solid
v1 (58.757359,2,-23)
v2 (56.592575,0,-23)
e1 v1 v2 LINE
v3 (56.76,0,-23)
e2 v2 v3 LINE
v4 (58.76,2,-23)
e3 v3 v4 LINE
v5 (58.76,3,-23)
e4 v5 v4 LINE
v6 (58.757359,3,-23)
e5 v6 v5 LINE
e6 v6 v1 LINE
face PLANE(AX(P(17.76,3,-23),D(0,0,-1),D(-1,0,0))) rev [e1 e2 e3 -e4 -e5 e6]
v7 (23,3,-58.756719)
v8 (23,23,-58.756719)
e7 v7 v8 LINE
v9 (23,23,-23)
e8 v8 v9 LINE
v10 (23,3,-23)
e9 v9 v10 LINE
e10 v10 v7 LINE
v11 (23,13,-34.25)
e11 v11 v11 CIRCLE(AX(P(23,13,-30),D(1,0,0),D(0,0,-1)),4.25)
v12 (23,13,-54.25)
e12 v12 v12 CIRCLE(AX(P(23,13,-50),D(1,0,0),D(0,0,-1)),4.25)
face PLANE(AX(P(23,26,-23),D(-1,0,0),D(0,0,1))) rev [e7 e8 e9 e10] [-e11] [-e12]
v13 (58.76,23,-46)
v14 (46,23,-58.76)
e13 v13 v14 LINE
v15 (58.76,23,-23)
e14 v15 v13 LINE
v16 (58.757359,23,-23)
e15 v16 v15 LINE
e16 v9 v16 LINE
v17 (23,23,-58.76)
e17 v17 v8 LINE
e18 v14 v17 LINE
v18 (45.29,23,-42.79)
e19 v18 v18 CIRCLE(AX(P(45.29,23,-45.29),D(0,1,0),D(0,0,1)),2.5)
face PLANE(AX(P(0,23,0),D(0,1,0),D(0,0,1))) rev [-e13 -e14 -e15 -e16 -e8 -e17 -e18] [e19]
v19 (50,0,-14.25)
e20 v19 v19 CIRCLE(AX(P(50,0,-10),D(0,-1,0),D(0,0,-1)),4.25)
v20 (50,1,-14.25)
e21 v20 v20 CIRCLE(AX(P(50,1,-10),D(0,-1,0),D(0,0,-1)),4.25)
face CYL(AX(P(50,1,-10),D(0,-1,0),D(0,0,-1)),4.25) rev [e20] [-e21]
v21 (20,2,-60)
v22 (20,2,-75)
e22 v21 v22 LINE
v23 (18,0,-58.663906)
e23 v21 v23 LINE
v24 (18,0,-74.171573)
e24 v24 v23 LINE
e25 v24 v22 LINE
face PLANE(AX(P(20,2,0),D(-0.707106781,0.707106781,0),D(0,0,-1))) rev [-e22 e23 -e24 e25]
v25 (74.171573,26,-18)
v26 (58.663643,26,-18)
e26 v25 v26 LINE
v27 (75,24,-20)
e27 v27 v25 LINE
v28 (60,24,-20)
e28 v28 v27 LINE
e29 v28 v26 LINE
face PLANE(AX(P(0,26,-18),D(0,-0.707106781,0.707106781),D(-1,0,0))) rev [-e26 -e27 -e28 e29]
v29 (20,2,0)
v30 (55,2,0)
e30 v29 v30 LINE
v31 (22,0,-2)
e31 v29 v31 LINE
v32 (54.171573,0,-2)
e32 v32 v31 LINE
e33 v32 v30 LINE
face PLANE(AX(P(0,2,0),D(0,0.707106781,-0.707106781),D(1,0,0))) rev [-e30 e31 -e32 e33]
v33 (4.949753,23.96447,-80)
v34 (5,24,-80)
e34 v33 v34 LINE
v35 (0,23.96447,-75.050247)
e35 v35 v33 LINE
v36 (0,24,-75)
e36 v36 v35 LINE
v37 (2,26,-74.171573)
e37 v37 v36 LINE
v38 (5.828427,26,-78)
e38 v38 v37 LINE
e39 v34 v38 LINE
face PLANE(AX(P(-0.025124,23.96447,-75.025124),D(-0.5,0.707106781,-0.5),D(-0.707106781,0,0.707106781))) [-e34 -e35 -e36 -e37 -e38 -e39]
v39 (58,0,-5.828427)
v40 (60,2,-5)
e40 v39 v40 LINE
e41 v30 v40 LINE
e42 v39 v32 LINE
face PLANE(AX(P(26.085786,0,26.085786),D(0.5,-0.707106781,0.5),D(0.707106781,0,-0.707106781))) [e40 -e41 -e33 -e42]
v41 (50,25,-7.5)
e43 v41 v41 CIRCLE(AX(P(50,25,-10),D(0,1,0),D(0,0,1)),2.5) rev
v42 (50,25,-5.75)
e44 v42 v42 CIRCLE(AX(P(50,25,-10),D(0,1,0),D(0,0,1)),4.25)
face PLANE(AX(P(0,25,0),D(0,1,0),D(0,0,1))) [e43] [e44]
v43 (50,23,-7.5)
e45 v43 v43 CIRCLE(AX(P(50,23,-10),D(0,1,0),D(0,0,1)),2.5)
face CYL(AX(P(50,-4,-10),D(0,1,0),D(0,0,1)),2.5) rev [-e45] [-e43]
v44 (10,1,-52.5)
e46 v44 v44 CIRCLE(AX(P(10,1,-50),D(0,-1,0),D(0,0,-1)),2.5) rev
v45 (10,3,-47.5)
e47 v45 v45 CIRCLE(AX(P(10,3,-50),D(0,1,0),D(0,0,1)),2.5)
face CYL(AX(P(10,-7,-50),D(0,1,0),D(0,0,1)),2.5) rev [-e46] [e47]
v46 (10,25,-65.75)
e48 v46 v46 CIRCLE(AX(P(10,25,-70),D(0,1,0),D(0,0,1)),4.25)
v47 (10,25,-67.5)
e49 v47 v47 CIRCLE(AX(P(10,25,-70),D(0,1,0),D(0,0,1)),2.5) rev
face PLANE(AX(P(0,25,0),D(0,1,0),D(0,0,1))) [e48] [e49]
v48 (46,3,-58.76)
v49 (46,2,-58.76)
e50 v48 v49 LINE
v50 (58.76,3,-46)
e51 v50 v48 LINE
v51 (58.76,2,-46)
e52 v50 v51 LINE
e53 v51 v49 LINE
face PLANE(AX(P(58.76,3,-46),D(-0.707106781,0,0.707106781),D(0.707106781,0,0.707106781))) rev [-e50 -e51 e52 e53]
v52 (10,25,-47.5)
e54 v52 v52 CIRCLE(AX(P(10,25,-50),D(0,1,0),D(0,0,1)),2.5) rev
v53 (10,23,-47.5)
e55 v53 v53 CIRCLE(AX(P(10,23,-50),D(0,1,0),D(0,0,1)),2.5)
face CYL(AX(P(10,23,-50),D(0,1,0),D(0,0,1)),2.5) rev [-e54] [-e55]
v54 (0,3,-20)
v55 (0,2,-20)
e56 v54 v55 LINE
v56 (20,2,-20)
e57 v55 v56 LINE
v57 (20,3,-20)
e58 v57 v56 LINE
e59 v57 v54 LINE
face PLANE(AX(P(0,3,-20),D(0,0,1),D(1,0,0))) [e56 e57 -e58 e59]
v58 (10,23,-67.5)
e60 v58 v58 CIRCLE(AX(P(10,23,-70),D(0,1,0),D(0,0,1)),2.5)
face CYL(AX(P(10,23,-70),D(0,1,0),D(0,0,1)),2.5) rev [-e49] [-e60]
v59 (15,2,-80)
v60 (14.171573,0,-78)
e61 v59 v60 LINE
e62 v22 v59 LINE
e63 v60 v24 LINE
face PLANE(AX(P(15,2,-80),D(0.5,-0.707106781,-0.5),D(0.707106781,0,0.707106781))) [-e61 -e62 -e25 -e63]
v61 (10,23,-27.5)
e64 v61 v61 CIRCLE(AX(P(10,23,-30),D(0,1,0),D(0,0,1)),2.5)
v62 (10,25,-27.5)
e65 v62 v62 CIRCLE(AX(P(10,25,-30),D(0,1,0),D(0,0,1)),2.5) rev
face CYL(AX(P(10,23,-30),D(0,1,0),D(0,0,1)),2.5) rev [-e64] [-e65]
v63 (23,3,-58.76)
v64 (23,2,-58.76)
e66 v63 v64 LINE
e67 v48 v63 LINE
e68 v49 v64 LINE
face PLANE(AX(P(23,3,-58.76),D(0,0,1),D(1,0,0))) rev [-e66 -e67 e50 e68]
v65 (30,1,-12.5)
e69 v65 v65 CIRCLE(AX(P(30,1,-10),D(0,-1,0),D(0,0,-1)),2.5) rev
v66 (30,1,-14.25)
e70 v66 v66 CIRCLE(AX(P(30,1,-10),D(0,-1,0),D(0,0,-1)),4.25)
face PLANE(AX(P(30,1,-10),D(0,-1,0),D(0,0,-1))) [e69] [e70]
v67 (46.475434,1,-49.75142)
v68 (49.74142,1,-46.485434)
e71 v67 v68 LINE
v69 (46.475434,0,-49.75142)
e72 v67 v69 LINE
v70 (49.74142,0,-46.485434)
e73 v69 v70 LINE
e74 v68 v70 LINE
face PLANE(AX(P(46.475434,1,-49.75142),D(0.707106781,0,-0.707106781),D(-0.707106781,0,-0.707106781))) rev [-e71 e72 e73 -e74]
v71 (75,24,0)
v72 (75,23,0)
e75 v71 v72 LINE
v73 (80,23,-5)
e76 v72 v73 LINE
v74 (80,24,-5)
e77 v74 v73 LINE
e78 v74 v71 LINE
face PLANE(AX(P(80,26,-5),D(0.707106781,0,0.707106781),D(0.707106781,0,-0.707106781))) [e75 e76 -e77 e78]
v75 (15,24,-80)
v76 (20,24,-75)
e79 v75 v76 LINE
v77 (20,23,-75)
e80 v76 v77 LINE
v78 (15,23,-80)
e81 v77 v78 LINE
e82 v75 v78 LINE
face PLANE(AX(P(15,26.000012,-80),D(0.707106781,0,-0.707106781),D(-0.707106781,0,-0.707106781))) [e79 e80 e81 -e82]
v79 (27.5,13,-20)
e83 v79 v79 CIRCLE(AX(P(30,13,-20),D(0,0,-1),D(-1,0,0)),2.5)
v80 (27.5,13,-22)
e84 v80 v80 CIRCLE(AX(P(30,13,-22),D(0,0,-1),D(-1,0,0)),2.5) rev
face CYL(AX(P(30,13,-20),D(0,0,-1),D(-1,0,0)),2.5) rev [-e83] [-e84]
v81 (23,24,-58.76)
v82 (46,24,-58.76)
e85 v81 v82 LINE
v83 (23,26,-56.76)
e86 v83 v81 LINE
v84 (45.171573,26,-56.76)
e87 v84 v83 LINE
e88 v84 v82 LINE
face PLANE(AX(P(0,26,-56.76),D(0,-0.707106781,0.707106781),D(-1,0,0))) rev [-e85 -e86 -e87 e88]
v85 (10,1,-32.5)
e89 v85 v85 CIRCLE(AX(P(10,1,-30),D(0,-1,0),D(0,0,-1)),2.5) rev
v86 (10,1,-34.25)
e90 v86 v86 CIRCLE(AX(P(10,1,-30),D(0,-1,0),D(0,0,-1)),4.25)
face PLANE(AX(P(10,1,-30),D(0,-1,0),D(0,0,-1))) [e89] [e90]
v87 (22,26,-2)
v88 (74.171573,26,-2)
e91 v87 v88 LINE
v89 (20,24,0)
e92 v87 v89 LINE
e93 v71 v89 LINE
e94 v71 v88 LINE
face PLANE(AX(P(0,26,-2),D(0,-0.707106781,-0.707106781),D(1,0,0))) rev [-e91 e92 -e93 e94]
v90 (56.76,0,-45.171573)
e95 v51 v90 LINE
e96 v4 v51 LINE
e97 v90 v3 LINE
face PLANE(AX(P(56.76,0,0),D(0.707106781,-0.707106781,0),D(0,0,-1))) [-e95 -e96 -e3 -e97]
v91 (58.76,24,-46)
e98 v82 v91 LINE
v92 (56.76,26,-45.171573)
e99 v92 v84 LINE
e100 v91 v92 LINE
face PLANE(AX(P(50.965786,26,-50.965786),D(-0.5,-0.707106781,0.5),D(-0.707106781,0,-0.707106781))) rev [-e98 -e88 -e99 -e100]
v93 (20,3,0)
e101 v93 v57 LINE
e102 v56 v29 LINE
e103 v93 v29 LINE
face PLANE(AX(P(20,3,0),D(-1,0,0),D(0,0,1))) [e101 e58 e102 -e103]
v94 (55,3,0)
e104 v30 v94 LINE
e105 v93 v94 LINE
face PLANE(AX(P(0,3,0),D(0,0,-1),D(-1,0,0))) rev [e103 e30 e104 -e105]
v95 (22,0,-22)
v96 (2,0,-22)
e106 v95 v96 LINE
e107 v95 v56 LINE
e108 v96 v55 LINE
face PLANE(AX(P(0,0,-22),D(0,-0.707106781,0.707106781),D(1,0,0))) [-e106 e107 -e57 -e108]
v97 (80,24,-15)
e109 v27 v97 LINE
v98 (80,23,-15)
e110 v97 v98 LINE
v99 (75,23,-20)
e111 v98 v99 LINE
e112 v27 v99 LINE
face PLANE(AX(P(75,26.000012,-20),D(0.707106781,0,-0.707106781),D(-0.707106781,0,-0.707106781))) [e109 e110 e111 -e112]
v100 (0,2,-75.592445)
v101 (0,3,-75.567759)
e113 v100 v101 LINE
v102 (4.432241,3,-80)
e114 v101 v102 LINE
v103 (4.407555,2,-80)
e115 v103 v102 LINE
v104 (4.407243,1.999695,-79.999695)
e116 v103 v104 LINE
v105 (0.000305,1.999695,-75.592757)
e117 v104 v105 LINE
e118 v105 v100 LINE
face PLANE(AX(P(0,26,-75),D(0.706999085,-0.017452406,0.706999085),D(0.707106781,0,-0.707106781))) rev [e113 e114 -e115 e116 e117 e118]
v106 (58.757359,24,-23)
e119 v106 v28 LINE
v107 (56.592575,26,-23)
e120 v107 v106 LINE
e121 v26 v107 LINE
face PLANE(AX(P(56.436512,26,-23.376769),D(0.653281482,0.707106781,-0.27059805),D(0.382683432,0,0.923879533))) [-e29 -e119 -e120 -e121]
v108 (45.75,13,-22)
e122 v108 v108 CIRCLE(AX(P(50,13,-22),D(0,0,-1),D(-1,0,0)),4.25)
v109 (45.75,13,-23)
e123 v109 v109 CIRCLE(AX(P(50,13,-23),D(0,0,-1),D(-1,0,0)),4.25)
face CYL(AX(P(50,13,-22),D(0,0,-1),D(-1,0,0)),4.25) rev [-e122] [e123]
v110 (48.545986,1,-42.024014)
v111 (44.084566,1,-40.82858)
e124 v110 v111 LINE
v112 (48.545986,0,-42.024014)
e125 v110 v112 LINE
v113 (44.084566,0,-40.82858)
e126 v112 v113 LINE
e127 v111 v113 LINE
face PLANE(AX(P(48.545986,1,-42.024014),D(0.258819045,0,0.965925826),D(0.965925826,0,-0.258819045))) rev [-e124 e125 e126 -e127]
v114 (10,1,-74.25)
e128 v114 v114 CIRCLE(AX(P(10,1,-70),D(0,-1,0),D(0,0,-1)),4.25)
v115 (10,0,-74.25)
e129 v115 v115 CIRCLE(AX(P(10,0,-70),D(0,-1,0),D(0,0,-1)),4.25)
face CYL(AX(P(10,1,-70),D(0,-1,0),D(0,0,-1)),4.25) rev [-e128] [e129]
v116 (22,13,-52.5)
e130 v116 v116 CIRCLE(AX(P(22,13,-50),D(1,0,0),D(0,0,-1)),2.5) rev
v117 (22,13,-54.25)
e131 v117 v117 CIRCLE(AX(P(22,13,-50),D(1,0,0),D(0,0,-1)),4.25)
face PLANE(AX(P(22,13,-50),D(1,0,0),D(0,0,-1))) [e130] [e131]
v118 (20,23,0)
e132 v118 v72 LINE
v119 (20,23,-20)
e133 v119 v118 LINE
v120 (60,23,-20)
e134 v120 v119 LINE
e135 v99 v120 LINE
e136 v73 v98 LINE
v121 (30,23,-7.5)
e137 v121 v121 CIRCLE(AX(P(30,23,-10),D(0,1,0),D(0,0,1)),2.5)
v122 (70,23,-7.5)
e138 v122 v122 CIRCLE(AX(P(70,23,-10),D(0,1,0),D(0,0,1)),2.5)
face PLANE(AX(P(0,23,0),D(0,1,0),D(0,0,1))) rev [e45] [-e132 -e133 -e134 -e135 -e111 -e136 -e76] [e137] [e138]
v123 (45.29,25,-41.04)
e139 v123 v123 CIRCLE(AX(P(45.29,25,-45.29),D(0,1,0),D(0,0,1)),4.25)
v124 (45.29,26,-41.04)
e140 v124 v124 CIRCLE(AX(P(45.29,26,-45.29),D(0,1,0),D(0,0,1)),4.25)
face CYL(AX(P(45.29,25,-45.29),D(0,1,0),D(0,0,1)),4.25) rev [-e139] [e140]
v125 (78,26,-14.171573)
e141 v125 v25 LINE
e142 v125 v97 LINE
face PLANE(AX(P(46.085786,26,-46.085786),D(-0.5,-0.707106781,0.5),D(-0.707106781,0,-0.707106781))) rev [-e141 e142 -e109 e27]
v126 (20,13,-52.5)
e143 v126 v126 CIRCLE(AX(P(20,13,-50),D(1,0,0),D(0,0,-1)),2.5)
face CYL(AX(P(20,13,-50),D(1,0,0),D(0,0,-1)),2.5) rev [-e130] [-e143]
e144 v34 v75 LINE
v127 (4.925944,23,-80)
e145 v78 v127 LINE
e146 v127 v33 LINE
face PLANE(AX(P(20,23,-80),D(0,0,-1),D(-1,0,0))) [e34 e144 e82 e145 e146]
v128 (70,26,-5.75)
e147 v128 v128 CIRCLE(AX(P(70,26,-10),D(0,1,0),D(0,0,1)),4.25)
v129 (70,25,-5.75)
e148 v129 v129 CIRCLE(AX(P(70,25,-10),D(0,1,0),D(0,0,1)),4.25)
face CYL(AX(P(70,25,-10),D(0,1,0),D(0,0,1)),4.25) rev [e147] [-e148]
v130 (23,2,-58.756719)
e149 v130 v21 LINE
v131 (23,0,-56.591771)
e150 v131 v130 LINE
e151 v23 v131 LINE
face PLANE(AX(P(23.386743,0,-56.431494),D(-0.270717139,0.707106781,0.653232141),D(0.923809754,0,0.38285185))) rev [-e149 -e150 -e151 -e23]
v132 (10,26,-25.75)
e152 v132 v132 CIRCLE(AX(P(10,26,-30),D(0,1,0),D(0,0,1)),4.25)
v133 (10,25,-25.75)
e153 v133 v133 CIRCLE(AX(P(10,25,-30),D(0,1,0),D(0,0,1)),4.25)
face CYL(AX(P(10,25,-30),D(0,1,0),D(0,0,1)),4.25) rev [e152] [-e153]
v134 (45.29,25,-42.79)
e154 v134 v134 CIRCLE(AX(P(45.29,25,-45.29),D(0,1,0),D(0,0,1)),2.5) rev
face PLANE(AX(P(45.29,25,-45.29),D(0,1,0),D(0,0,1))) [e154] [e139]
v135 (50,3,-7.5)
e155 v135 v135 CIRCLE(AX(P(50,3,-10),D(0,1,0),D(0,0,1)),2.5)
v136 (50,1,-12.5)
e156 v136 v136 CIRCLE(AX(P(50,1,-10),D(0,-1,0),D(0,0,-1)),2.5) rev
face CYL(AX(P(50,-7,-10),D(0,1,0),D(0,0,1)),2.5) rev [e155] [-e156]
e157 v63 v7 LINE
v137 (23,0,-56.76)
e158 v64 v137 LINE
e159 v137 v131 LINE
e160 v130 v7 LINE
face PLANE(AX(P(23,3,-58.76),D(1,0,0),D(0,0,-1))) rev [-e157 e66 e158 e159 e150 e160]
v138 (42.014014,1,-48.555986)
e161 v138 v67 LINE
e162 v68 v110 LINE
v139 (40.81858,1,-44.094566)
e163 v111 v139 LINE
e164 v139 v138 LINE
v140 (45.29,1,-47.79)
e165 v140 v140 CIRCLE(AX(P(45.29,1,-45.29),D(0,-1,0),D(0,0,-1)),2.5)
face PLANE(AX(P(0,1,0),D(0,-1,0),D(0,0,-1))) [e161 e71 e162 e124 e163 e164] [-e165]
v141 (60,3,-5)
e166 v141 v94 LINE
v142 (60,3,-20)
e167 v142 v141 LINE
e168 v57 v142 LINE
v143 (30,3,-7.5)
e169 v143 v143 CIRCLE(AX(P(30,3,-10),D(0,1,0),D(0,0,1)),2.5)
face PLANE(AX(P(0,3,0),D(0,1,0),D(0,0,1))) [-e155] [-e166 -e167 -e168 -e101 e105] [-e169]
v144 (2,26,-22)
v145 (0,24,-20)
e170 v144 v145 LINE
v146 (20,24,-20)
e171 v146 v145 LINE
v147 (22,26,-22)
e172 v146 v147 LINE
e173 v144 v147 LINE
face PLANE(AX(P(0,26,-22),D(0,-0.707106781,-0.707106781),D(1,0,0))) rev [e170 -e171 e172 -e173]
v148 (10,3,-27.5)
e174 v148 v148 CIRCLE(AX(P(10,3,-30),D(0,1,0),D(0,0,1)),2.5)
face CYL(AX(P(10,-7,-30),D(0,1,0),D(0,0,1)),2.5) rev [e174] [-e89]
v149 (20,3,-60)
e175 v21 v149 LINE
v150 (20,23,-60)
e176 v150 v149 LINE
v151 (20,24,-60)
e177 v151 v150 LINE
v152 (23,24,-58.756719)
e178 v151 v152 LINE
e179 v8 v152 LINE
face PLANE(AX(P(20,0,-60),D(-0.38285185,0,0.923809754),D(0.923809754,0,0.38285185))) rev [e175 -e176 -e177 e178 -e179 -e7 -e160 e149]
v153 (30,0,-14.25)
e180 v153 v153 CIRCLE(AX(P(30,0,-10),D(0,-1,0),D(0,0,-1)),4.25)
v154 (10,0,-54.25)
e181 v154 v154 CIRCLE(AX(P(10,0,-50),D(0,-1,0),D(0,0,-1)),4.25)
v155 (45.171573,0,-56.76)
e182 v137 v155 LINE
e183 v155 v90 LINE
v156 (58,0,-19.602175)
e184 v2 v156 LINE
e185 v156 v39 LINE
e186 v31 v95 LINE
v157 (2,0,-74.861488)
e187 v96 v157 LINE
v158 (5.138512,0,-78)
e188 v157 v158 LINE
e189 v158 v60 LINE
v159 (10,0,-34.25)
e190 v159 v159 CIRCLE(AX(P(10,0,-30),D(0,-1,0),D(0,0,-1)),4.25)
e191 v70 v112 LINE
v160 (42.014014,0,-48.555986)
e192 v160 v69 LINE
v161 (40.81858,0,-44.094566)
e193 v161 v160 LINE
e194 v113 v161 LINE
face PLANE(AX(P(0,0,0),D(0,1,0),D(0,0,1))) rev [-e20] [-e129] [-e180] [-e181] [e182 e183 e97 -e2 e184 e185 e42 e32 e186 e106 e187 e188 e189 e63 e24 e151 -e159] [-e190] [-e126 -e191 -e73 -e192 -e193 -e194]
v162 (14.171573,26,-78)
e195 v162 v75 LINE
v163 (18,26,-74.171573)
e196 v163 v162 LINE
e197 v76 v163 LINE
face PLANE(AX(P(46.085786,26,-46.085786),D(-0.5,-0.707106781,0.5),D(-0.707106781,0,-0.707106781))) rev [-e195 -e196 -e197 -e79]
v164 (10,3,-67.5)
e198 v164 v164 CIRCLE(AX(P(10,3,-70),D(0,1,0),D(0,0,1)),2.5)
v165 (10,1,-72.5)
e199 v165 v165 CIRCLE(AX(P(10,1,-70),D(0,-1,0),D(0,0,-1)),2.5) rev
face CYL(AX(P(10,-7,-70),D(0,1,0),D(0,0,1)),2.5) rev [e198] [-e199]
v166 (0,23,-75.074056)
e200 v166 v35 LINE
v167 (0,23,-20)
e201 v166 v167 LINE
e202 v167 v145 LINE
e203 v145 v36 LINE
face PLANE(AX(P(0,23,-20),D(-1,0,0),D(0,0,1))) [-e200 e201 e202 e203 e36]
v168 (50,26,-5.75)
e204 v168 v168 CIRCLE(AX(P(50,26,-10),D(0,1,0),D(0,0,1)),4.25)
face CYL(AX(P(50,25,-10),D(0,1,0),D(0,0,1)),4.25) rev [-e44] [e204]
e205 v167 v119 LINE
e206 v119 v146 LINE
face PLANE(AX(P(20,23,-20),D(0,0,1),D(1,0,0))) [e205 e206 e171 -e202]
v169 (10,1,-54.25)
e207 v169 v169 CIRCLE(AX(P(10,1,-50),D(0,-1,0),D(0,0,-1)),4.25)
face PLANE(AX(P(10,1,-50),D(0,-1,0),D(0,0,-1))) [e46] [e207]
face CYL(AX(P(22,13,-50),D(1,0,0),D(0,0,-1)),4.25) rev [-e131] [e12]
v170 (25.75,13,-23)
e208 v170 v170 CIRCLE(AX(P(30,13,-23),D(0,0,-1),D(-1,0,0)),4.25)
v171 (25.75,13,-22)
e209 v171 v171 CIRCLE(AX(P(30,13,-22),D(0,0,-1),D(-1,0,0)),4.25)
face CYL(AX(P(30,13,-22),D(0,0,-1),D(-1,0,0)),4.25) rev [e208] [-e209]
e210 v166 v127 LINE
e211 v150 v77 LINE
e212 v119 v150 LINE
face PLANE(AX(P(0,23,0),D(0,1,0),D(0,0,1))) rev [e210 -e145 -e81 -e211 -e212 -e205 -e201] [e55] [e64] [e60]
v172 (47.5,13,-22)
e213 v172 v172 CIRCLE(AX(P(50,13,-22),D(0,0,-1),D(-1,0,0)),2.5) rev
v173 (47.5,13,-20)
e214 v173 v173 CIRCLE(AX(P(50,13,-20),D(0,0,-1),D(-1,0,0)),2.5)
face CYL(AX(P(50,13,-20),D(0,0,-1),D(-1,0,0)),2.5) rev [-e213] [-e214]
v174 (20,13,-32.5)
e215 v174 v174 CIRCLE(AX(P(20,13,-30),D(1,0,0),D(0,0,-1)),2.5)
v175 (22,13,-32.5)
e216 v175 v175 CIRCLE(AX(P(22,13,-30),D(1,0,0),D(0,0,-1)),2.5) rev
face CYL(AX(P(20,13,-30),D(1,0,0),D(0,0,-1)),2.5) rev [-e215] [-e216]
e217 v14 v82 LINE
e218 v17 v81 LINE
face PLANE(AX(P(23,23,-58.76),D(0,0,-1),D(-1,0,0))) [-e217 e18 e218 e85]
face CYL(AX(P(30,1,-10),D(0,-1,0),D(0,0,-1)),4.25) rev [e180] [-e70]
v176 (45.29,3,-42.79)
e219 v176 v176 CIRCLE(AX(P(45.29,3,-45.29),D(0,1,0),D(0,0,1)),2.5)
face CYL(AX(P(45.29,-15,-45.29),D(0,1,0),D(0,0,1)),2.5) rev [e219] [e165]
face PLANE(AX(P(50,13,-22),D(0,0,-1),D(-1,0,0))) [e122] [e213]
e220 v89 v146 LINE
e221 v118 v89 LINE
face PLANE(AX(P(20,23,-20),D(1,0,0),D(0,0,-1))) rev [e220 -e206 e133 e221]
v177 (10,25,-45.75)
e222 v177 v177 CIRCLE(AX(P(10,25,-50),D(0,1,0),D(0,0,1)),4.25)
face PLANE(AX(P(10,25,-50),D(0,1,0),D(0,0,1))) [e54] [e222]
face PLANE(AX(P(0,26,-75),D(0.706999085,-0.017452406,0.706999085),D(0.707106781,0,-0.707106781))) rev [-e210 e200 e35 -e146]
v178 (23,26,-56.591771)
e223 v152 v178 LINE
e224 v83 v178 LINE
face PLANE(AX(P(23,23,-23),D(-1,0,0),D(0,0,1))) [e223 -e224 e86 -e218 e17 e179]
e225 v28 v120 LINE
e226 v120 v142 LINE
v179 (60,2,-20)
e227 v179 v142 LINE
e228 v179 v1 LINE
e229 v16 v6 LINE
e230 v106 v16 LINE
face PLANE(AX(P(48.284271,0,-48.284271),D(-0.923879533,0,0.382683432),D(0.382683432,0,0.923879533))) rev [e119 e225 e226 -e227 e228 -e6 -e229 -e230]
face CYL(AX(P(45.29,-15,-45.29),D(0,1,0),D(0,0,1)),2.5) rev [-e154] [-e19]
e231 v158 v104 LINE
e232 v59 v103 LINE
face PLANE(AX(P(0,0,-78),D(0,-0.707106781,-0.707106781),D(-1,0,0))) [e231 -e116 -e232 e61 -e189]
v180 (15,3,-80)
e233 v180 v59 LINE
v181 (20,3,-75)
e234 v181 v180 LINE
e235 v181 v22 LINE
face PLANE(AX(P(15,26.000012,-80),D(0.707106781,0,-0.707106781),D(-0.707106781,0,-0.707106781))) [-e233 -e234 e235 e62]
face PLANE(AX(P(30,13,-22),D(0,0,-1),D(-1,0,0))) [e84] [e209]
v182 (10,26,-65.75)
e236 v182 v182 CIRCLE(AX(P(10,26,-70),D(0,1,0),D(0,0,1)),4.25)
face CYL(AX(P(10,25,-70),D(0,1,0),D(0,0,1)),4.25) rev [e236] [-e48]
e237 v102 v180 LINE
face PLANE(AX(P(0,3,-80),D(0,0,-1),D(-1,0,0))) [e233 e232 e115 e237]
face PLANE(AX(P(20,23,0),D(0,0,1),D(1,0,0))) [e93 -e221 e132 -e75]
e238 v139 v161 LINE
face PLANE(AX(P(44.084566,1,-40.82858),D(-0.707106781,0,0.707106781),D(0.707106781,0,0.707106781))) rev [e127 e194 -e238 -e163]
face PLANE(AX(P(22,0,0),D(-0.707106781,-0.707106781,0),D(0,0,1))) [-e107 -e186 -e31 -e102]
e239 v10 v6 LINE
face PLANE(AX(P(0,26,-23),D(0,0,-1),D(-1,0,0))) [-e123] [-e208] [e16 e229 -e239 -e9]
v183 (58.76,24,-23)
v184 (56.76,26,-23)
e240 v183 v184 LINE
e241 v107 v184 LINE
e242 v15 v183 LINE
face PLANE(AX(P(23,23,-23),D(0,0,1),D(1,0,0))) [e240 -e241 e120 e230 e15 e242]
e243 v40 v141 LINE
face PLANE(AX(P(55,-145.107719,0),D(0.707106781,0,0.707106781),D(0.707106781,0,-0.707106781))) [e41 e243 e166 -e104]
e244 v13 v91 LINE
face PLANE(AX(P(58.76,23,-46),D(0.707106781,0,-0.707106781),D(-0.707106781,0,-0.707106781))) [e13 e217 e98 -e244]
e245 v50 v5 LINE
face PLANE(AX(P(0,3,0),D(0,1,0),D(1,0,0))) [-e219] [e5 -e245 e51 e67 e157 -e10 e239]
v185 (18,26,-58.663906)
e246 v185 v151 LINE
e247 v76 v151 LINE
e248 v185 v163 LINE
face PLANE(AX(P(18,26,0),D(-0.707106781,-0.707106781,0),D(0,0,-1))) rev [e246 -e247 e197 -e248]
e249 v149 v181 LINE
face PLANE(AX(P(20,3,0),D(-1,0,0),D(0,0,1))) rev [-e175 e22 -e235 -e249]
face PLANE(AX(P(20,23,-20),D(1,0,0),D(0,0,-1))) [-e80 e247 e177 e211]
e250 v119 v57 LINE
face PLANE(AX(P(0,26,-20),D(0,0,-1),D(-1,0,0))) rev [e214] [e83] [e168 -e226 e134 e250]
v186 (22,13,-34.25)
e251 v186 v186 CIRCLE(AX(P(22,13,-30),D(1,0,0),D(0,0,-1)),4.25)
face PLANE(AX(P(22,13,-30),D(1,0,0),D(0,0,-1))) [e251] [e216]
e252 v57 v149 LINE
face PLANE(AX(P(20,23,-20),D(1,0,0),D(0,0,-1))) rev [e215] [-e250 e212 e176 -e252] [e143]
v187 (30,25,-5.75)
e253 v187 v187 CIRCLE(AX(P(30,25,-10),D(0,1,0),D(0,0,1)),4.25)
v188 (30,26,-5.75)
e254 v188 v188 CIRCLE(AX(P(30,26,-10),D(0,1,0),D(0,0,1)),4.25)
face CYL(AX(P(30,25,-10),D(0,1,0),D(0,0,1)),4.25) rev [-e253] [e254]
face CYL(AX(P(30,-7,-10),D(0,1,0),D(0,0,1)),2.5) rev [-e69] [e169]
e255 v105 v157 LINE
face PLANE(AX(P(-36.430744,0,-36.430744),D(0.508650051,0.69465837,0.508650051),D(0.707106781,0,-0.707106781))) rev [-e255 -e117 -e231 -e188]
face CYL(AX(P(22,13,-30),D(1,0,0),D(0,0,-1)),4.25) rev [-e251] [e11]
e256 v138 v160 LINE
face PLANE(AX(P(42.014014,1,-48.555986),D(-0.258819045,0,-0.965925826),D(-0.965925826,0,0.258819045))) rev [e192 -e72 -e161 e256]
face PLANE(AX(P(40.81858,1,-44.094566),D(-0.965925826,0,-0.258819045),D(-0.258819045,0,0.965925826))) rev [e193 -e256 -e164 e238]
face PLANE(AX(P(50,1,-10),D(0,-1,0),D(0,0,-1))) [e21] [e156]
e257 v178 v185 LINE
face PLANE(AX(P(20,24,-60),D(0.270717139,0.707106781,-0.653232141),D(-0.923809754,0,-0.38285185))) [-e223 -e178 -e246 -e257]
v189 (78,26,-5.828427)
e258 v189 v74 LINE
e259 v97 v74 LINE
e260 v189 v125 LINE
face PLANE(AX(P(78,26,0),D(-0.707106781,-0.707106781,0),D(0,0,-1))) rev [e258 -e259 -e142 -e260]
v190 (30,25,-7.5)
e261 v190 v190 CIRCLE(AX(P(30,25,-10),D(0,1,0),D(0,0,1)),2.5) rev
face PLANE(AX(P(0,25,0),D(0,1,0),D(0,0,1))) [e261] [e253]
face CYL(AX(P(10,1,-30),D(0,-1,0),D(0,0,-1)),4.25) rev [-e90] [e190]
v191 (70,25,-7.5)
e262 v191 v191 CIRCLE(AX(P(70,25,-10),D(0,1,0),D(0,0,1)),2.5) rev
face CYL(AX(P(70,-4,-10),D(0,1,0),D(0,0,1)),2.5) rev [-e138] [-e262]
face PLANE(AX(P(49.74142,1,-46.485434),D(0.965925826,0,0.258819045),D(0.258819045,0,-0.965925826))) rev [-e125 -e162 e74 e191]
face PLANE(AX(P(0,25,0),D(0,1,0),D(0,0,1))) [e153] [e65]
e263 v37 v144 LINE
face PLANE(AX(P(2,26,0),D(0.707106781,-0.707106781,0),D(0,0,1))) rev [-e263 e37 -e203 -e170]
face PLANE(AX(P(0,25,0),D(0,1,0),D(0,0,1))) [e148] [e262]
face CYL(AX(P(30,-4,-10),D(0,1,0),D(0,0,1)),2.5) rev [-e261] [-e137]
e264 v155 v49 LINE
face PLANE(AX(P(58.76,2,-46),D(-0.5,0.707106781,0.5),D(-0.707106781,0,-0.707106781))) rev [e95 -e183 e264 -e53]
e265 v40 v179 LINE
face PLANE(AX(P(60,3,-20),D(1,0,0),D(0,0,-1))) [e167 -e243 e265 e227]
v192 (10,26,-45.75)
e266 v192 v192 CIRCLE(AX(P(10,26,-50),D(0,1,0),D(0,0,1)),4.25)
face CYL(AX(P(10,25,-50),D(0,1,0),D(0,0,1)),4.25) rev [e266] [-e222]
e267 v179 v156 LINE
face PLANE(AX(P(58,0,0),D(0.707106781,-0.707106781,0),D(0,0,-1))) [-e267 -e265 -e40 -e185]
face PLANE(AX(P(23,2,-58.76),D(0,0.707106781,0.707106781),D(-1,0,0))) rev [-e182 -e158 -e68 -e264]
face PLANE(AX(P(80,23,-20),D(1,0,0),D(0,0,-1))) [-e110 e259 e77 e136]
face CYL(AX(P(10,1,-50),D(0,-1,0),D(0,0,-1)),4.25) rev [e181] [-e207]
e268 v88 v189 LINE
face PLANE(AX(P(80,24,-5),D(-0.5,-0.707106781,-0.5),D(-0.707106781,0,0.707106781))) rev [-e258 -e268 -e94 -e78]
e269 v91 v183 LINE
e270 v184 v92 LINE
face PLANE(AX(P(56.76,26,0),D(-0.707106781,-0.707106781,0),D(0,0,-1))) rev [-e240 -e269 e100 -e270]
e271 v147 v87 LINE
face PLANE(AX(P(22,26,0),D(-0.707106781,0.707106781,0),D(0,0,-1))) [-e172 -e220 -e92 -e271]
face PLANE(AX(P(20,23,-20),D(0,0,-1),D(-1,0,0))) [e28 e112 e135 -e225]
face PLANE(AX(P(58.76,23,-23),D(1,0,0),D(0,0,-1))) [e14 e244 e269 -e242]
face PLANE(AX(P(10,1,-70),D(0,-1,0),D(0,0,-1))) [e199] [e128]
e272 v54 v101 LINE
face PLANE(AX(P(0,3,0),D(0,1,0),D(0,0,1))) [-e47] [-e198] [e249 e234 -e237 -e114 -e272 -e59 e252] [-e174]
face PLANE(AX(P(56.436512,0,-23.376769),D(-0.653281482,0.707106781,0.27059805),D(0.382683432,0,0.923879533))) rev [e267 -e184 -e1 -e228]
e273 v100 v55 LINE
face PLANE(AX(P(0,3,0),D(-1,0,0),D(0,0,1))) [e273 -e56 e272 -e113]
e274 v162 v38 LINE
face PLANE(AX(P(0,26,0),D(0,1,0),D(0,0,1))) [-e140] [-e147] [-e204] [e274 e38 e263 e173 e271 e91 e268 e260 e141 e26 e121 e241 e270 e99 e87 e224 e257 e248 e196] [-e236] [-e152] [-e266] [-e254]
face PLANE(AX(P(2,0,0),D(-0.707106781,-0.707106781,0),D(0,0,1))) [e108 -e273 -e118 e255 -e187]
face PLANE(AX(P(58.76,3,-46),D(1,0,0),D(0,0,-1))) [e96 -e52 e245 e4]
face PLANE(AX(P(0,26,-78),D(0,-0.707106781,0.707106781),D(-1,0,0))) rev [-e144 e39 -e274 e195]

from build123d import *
from OCP.BRepFilletAPI import BRepFilletAPI_MakeChamfer

# Parameters (mm, degrees)
SKETCH1_W                    = 20
SKETCH1_H                    = 80
SKETCH1_W_2                  = 60
SKETCH1_H_2                  = 20
BOSS_EXTRUDE1_DEPTH          = 3
EXTRUDE_THIN10_DEPTH         = 3
SKETCH5_W                    = 20
SKETCH5_H                    = 20
CUT_EXTRUDE2_DEPTH           = 3
SKETCH6_R                    = 2.5
CUT_EXTRUDE3_DEPTH           = 10
BOSS_EXTRUDE7_DEPTH          = 23
SKETCH8_W                    = 0.297396294
SKETCH8_H                    = 3
BOSS_EXTRUDE8_DEPTH          = 23
SKETCH13_W                   = 3
SKETCH13_H                   = 35.56274761
BOSS_EXTRUDE9_DEPTH          = 26
SKETCH14_W                   = 3
SKETCH14_H                   = 1.444164959
BOSS_EXTRUDE10_DEPTH         = 23
CUT_EXTRUDE_THIN2_DEPTH      = 116.451288429
CUT_EXTRUDE_THIN2_DEPTH_BACK = 31
SKETCH16_W                   = 60
SKETCH16_H                   = 20
BOSS_EXTRUDE11_DEPTH         = 3
SKETCH18_W                   = 1.4
SKETCH18_H                   = 3
BOSS_EXTRUDE12_DEPTH         = 23
SKETCH19_R                   = 2.5
CUT_EXTRUDE10_DEPTH          = 30
SKETCH20_W                   = 20
SKETCH20_H                   = 60
BOSS_EXTRUDE13_DEPTH         = 3
SKETCH21_R                   = 2.5
CUT_EXTRUDE12_DEPTH          = 3
SKETCH22_R                   = 2.5
CUT_EXTRUDE13_DEPTH          = 3
SKETCH23_R                   = 2.5
CUT_EXTRUDE14_DEPTH          = 3
CUT_EXTRUDE_THIN3_DEPTH      = 117.086174887
CUT_EXTRUDE_THIN3_DEPTH_BACK = 3
CUT_EXTRUDE_THIN4_DEPTH      = 117.086174887
CUT_EXTRUDE_THIN4_DEPTH_BACK = 30
CUT_EXTRUDE_THIN5_START      = -58
CUT_EXTRUDE_THIN5_OUTLINE_W  = 10
CUT_EXTRUDE_THIN5_OUTLINE_H  = 29
CUT_EXTRUDE_THIN5_DEPTH      = 4.521306028
CUT_EXTRUDE_THIN6_DEPTH      = 117.086174887
CUT_EXTRUDE_THIN6_DEPTH_BACK = 30
SKETCH31_W                   = 21
SKETCH31_H                   = 20
CUT_EXTRUDE_THIN7_DEPTH      = 3
CUT_EXTRUDE15_DEPTH          = 117.086174887
CUT_EXTRUDE15_DEPTH_BACK     = 3
CHAMFER12_SIZE               = 2
CHAMFER13_SIZE               = 2
CHAMFER14_SIZE               = 2
CHAMFER17_SIZE               = 2
CHAMFER19_SIZE               = 2
SKETCH34_R                   = 4.25
SKETCH34_R_2                 = 2.5
CUT_EXTRUDE16_DEPTH          = 1
CUT_EXTRUDE17_START          = -1
SKETCH35_R                   = 4.25
CUT_EXTRUDE17_DEPTH          = 1
SKETCH37_R                   = 4.25
CUT_EXTRUDE18_DEPTH          = 1
SKETCH38_R                   = 4.25
CUT_EXTRUDE19_DEPTH          = 1
BOSS_EXTRUDE16_DEPTH         = 3
SKETCH41_W                   = 37.632579405
SKETCH41_H                   = 10.938249111
CUT_EXTRUDE20_DEPTH          = 40
SKETCH44_W                   = 41
SKETCH44_H                   = 23
EXTRUDE_THIN11_DEPTH         = 3
EXTRUDE_THIN12_DEPTH         = 3
CHAMFER20_SIZE               = 2
CHAMFER21_SIZE               = 2
CHAMFER21_SIZE2              = 1.965988204
CHAMFER21_SIZE2_2            = 2.035840382
CHAMFER22_SIZE               = 2
CHAMFER23_SIZE               = 2
CUT_EXTRUDE28_DEPTH          = 1
SKETCH45_R                   = 2.5
CUT_EXTRUDE29_DEPTH          = 41
SKETCH47_R                   = 4.25
CUT_EXTRUDE30_DEPTH          = 1


with BuildPart() as part:
    # Sketch1 → Boss-Extrude1 (new body)
    with BuildSketch(Plane(origin=(0, 0, 0), x_dir=(1, 0, 0), z_dir=(0, 1, 0))):
        with Locations((10, 40)):
            Rectangle(SKETCH1_W, SKETCH1_H)
        with Locations((50, 10)):
            Rectangle(SKETCH1_W_2, SKETCH1_H_2)
    extrude(amount=BOSS_EXTRUDE1_DEPTH)

    # Sketch3 → Extrude-Thin10 (add)
    with BuildSketch(Plane(origin=(0, 3, 0), x_dir=(1, 0, 0), z_dir=(0, 1, 0))):
        Polygon((20, 60.000000002), (48.284271248, 48.28427125), (60, 20), (23.044818699, 4.692662707), (17.669596658, 17.669596661), (4.692662706, 23.044818701), align=None)
    extrude(amount=-EXTRUDE_THIN10_DEPTH)

    # Sketch5 → Cut-Extrude2 (cut)
    with BuildSketch(Plane(origin=(0, 0, 0), x_dir=(1, 0, 0), z_dir=(0, 1, 0))):
        with Locations((10, 10)):
            Rectangle(SKETCH5_W, SKETCH5_H)
    extrude(amount=CUT_EXTRUDE2_DEPTH, mode=Mode.SUBTRACT)

    # Sketch6 → Cut-Extrude3 (cut)
    with BuildSketch(Plane(origin=(0, 3, 0), x_dir=(1, 0, 0), z_dir=(0, 1, 0))):
        with Locations(Location((30, 10, 0), (0, 0, 270))):
            Circle(SKETCH6_R)
        with Locations(Location((50, 10, 0), (0, 0, 270))):
            Circle(SKETCH6_R)
        with Locations(Location((70, 10, 0), (0, 0, 270))):
            Circle(SKETCH6_R)
        with Locations(Location((10, 30, 0), (0, 0, 270))):
            Circle(SKETCH6_R)
        with Locations(Location((10, 50, 0), (0, 0, 270))):
            Circle(SKETCH6_R)
        with Locations(Location((10, 70, 0), (0, 0, 270))):
            Circle(SKETCH6_R)
    extrude(amount=-CUT_EXTRUDE3_DEPTH, mode=Mode.SUBTRACT)

    # Sketch7 → Boss-Extrude7 (add)
    with BuildSketch(Plane(origin=(0, 3, 0), x_dir=(1, 0, 0), z_dir=(0, 1, 0))):
        Polygon((21.395504865, 23), (21.395504865, 20), (60, 20), (58.757359313, 23), align=None)
    extrude(amount=BOSS_EXTRUDE7_DEPTH)

    # Sketch8 → Boss-Extrude8 (add)
    with BuildSketch(Plane(origin=(0, 0, 0), x_dir=(1, 0, 0), z_dir=(0, 1, 0))):
        with Locations((20.148698147, 21.5)):
            Rectangle(SKETCH8_W, SKETCH8_H)
    extrude(amount=BOSS_EXTRUDE8_DEPTH)

    # Sketch13 → Boss-Extrude9 (add)
    with BuildSketch(Plane(origin=(0, 0, 0), x_dir=(1, 0, 0), z_dir=(0, 1, 0))):
        with Locations((21.5, 40.781373805)):
            Rectangle(SKETCH13_W, SKETCH13_H)
    extrude(amount=BOSS_EXTRUDE9_DEPTH)

    # Sketch14 → Boss-Extrude10 (add)
    with BuildSketch(Plane(origin=(0, 3, 0), x_dir=(1, 0, 0), z_dir=(0, 1, 0))):
        with Locations((21.5, 59.277917521)):
            Rectangle(SKETCH14_W, SKETCH14_H)
    extrude(amount=BOSS_EXTRUDE10_DEPTH)

    # Sketch15 → Cut-Extrude-Thin2 (cut, two sides: drawn at the far end of the back side and taken through both)
    with BuildSketch(Plane(origin=(0, 3, 0), x_dir=(-1, 0, 0), z_dir=(0, -1, 0)).offset(-CUT_EXTRUDE_THIN2_DEPTH_BACK)):
        Polygon((-20, 60), (-48.28, 48.28), (-49.42855555, 51.051429261), (-21.14855555, 62.771429261), align=None)
    extrude(amount=CUT_EXTRUDE_THIN2_DEPTH + CUT_EXTRUDE_THIN2_DEPTH_BACK, mode=Mode.SUBTRACT)



with BuildPart() as body_2:
    # Sketch16 → Boss-Extrude11 (new body)
    with BuildSketch(Plane(origin=(0, 26, 0), x_dir=(1, 0, 0), z_dir=(0, 1, 0))):
        with Locations((50, 10)):
            Rectangle(SKETCH16_W, SKETCH16_H)
    extrude(amount=-BOSS_EXTRUDE11_DEPTH)


with BuildPart() as part_1:
    add(part.part)

    add(body_2.part)  # Boss-Extrude12 merges body 2
    # Sketch18 → Boss-Extrude12 (add)
    with BuildSketch(Plane(origin=(0, 3, 0), x_dir=(1, 0, 0), z_dir=(0, 1, 0))):
        with Locations((20.7, 21.5)):
            Rectangle(SKETCH18_W, SKETCH18_H)
    extrude(amount=BOSS_EXTRUDE12_DEPTH)

    # Sketch19 → Cut-Extrude10 (cut)
    with BuildSketch(Plane(origin=(0, 26, 0), x_dir=(1, 0, 0), z_dir=(0, 1, 0))):
        with Locations(Location((50, 10, 0), (0, 0, 270))):
            Circle(SKETCH19_R)
        with Locations(Location((30, 10, 0), (0, 0, 270))):
            Circle(SKETCH19_R)
        with Locations(Location((70, 10, 0), (0, 0, 270))):
            Circle(SKETCH19_R)
    extrude(amount=-CUT_EXTRUDE10_DEPTH, mode=Mode.SUBTRACT)

    # Sketch20 → Boss-Extrude13 (add)
    with BuildSketch(Plane(origin=(0, 26, 0), x_dir=(1, 0, 0), z_dir=(0, 1, 0))):
        with Locations((10, 50)):
            Rectangle(SKETCH20_W, SKETCH20_H)
    extrude(amount=-BOSS_EXTRUDE13_DEPTH)

    # Sketch21 → Cut-Extrude12 (cut)
    with BuildSketch(Plane(origin=(0, 0, -23), x_dir=(-1, 0, 0), z_dir=(0, 0, -1))):
        with Locations((-50, 13)):
            Circle(SKETCH21_R)
        with Locations((-30, 13)):
            Circle(SKETCH21_R)
    extrude(amount=-CUT_EXTRUDE12_DEPTH, mode=Mode.SUBTRACT)

    # Sketch22 → Cut-Extrude13 (cut)
    with BuildSketch(Plane(origin=(23, 0, 0), x_dir=(0, 0, -1), z_dir=(1, 0, 0))):
        with Locations((30, 13)):
            Circle(SKETCH22_R)
        with Locations((50, 13)):
            Circle(SKETCH22_R)
    extrude(amount=-CUT_EXTRUDE13_DEPTH, mode=Mode.SUBTRACT)

    # Sketch23 → Cut-Extrude14 (cut)
    with BuildSketch(Plane(origin=(0, 26, 0), x_dir=(1, 0, 0), z_dir=(0, 1, 0))):
        with Locations(Location((10, 30, 0), (0, 0, 270))):
            Circle(SKETCH23_R)
        with Locations(Location((10, 50, 0), (0, 0, 270))):
            Circle(SKETCH23_R)
        with Locations(Location((10, 70, 0), (0, 0, 270))):
            Circle(SKETCH23_R)
    extrude(amount=-CUT_EXTRUDE14_DEPTH, mode=Mode.SUBTRACT)

    # Sketch24 → Cut-Extrude-Thin3 (cut, two sides: drawn at the far end of the back side and taken through both)
    with BuildSketch(Plane(origin=(0, 0, 0), x_dir=(1, 0, 0), z_dir=(0, 1, 0)).offset(-CUT_EXTRUDE_THIN3_DEPTH_BACK)):
        Polygon((80, 5), (75, 0), (78.535533906, -3.535533906), (83.535533906, 1.464466094), align=None)
    extrude(amount=CUT_EXTRUDE_THIN3_DEPTH + CUT_EXTRUDE_THIN3_DEPTH_BACK, mode=Mode.SUBTRACT)

    # Sketch27 → Cut-Extrude-Thin4 (cut, two sides: drawn at the far end of the back side and taken through both)
    with BuildSketch(Plane(origin=(0, 26, 0), x_dir=(1, 0, 0), z_dir=(0, 1, 0)).offset(-CUT_EXTRUDE_THIN4_DEPTH_BACK)):
        Polygon((75, 20), (80, 15), (83.535533906, 18.535533906), (78.535533906, 23.535533906), align=None)
    extrude(amount=CUT_EXTRUDE_THIN4_DEPTH + CUT_EXTRUDE_THIN4_DEPTH_BACK, mode=Mode.SUBTRACT)

    # Cut-Extrude-Thin5: read off the stored shape, not the designer's step
    # Cut-Extrude-Thin5 outline → Cut-Extrude-Thin5 (cut)
    with BuildSketch(Plane(origin=(0, 0, 0), x_dir=(0.7072144605741779, 0.017447091479365764, -0.706783775813852), z_dir=(0.7069990853988247, -0.017452406437283494, 0.7069990853988237)).offset(CUT_EXTRUDE_THIN5_START)):
        with Locations((57, 11.5)):
            Rectangle(CUT_EXTRUDE_THIN5_OUTLINE_W, CUT_EXTRUDE_THIN5_OUTLINE_H)
    extrude(amount=CUT_EXTRUDE_THIN5_DEPTH, mode=Mode.SUBTRACT)

    # Sketch29 → Cut-Extrude-Thin6 (cut, two sides: drawn at the far end of the back side and taken through both)
    with BuildSketch(Plane(origin=(0, 26, 0), x_dir=(1, 0, 0), z_dir=(0, 1, 0)).offset(-CUT_EXTRUDE_THIN6_DEPTH_BACK)):
        Polygon((15, 80), (20, 75), (23.535533906, 78.535533906), (18.535533906, 83.535533906), align=None)
    extrude(amount=CUT_EXTRUDE_THIN6_DEPTH + CUT_EXTRUDE_THIN6_DEPTH_BACK, mode=Mode.SUBTRACT)

    # Sketch31 → Cut-Extrude-Thin7 (cut)
    with BuildSketch(Plane.XZ):
        with Locations((70.5, -10)):
            Rectangle(SKETCH31_W, SKETCH31_H)
    extrude(amount=-CUT_EXTRUDE_THIN7_DEPTH, mode=Mode.SUBTRACT)

    # Sketch32 → Cut-Extrude15 (cut, two sides: drawn at the far end of the back side and taken through both)
    with BuildSketch(Plane.XZ.offset(-CUT_EXTRUDE15_DEPTH_BACK)):
        Polygon((-89.366369989, 144.366369989), (55, 0), (60, -5), (204.366369989, -149.366369989), (493.099109968, 139.366369989), (199.366369989, 433.099109968), align=None)
    extrude(amount=CUT_EXTRUDE15_DEPTH + CUT_EXTRUDE15_DEPTH_BACK, mode=Mode.SUBTRACT)

    # Chamfer12
    chamfer12_edges = [part_1.edges().sort_by_distance(p)[0] for p in [
        (20, 26, -67.5),
    ]]
    chamfer(chamfer12_edges, length=CHAMFER12_SIZE)

    # Chamfer13
    chamfer13_edges = [part_1.edges().sort_by_distance(p)[0] for p in [
        (47.5, 26, 0),
        (10, 26, -20),
        (77.5, 26, -17.5),
    ]]
    chamfer(chamfer13_edges, length=CHAMFER13_SIZE)

    # Chamfer14
    chamfer14_edges = [part_1.edges().sort_by_distance(p)[0] for p in [
        (20, 0, -67.500000001),
        (0, 0, -47.820907464),
        (9.679092536, 0, -80),
        (10, 26, -80),
        (0, 26, -48.5),
        (20, 26, -12),
        (80, 26, -8.585786438),
    ]]
    chamfer(chamfer14_edges, length=CHAMFER14_SIZE)

    # Chamfer17
    chamfer17_edges = [part_1.edges().sort_by_distance(p)[0] for p in [
        (66.085786438, 26, -20),
    ]]
    chamfer(chamfer17_edges, length=CHAMFER17_SIZE)

    # Chamfer19
    chamfer19_edges = [part_1.edges().sort_by_distance(p)[0] for p in [
        (37.5, 0, 0),
    ]]
    chamfer(chamfer19_edges, length=CHAMFER19_SIZE)

    # Sketch34 → Cut-Extrude16 (cut)
    # profile 1 of 6: a face of its own
    with BuildSketch(Plane(origin=(0, 26, 0), x_dir=(1, 0, 0), z_dir=(0, 1, 0))):
        with Locations(Location((10, 30, 0), (0, 0, 270))):
            Circle(SKETCH34_R)
        with Locations(Location((10, 30, 0), (0, 0, 270))):
            Circle(SKETCH34_R_2, mode=Mode.SUBTRACT)
    # profile 2 of 6: a face of its own
    with BuildSketch(Plane(origin=(0, 26, 0), x_dir=(1, 0, 0), z_dir=(0, 1, 0))):
        with Locations(Location((10, 70, 0), (0, 0, 270))):
            Circle(SKETCH34_R)
        with Locations(Location((10, 70, 0), (0, 0, 270))):
            Circle(SKETCH34_R_2, mode=Mode.SUBTRACT)
    # profile 3 of 6: a face of its own
    with BuildSketch(Plane(origin=(0, 26, 0), x_dir=(1, 0, 0), z_dir=(0, 1, 0))):
        with Locations(Location((30, 10, 0), (0, 0, 270))):
            Circle(SKETCH34_R)
        with Locations(Location((30, 10, 0), (0, 0, 270))):
            Circle(SKETCH34_R_2, mode=Mode.SUBTRACT)
    # profile 4 of 6: a face of its own
    with BuildSketch(Plane(origin=(0, 26, 0), x_dir=(1, 0, 0), z_dir=(0, 1, 0))):
        with Locations(Location((50, 10, 0), (0, 0, 270))):
            Circle(SKETCH34_R)
        with Locations(Location((50, 10, 0), (0, 0, 270))):
            Circle(SKETCH34_R_2, mode=Mode.SUBTRACT)
    # profile 5 of 6: a face of its own
    with BuildSketch(Plane(origin=(0, 26, 0), x_dir=(1, 0, 0), z_dir=(0, 1, 0))):
        with Locations(Location((70, 10, 0), (0, 0, 270))):
            Circle(SKETCH34_R)
        with Locations(Location((70, 10, 0), (0, 0, 270))):
            Circle(SKETCH34_R_2, mode=Mode.SUBTRACT)
    # profile 6 of 6: a face of its own
    with BuildSketch(Plane(origin=(0, 26, 0), x_dir=(1, 0, 0), z_dir=(0, 1, 0))):
        with Locations(Location((10, 50, 0), (0, 0, 270))):
            Circle(SKETCH34_R)
    extrude(amount=-CUT_EXTRUDE16_DEPTH, mode=Mode.SUBTRACT)

    # Sketch35 → Cut-Extrude17 (cut)
    with BuildSketch(Plane.XZ.offset(CUT_EXTRUDE17_START)):
        with Locations(Location((50, -10, 0), (0, 0, 90))):
            Circle(SKETCH35_R)
        with Locations(Location((30, -10, 0), (0, 0, 90))):
            Circle(SKETCH35_R)
        with Locations(Location((10, -30, 0), (0, 0, 90))):
            Circle(SKETCH35_R)
        with Locations(Location((10, -50, 0), (0, 0, 90))):
            Circle(SKETCH35_R)
        with Locations(Location((10, -70, 0), (0, 0, 90))):
            Circle(SKETCH35_R)
    extrude(amount=CUT_EXTRUDE17_DEPTH, mode=Mode.SUBTRACT)

    # Sketch37 → Cut-Extrude18 (cut)
    with BuildSketch(Plane(origin=(0, 0, -23), x_dir=(-1, 0, 0), z_dir=(0, 0, -1))):
        with Locations((-50, 13)):
            Circle(SKETCH37_R)
        with Locations((-30, 13)):
            Circle(SKETCH37_R)
    extrude(amount=-CUT_EXTRUDE18_DEPTH, mode=Mode.SUBTRACT)

    # Sketch38 → Cut-Extrude19 (cut)
    with BuildSketch(Plane(origin=(23, 0, 0), x_dir=(0, 0, -1), z_dir=(1, 0, 0))):
        with Locations((30, 13)):
            Circle(SKETCH38_R)
        with Locations((50, 13)):
            Circle(SKETCH38_R)
    extrude(amount=-CUT_EXTRUDE19_DEPTH, mode=Mode.SUBTRACT)

    # Sketch30 → Boss-Extrude16 (add)
    with BuildSketch(Plane(origin=(0, 26, 0), x_dir=(1, 0, 0), z_dir=(0, 1, 0))):
        Polygon((58.76, 23), (58.76, 46), (46, 58.76), (23, 58.76), (23, 23), align=None)
    extrude(amount=-BOSS_EXTRUDE16_DEPTH)

    # Sketch41 → Cut-Extrude20 (cut)
    with BuildSketch(Plane(origin=(0, 0, -23), x_dir=(-1, 0, 0), z_dir=(0, 0, -1))):
        with Locations((-41.816289703, -2.469124556)):
            Rectangle(SKETCH41_W, SKETCH41_H)
    extrude(amount=CUT_EXTRUDE20_DEPTH, mode=Mode.SUBTRACT)

    # Sketch44 → Extrude-Thin11 (add)
    with BuildSketch(Plane(origin=(0, 0, 0), x_dir=(-1, 0, 0), z_dir=(0, -1, 0))):
        with Locations((-38.26, 34.5)):
            Rectangle(SKETCH44_W, SKETCH44_H)
    extrude(amount=-EXTRUDE_THIN11_DEPTH)

    # Sketch43 → Extrude-Thin12 (add)
    with BuildSketch(Plane(origin=(0, 0, 0), x_dir=(-1, 0, 0), z_dir=(0, -1, 0))):
        Polygon((-23, 58.76), (-46, 58.76), (-58.76, 46), (-29.768621971, 17.008621971), (-29.017243943, 17.76), (-23, 17.76), align=None)
    extrude(amount=-EXTRUDE_THIN12_DEPTH)

    # Chamfer20
    # the kernel refuses this chamfer: 2 mm, written as the material it takes off along each edge
    with BuildSketch(Plane(origin=(20, 0, -20), x_dir=(0, 1, 0), z_dir=(-1, 0, 0))) as chamfer20_piece_1:
        Polygon((CHAMFER20_SIZE, 0), (0, CHAMFER20_SIZE), (0, 0), align=None)
    extrude(amount=23.143365976, mode=Mode.SUBTRACT)
    with BuildSketch(Plane(origin=(27.751491656, 0, -56.787571351), x_dir=(0, 1, 0), z_dir=(-0.9238097537211767, 0, -0.38285184984484394))) as chamfer20_piece_2_section:
        Polygon((CHAMFER20_SIZE, 0), (0, -CHAMFER20_SIZE), (0, 0), align=None)
    chamfer20_piece_2 = extrude(amount=15.699101739, mode=Mode.PRIVATE)
    chamfer20_piece_2 = split(chamfer20_piece_2, bisect_by=Plane(origin=(22.875745828, 4.875745828, -56.787571351), z_dir=(0.7071067811865476, -0.7071067811865476, 0)), keep=Keep.TOP, mode=Mode.PRIVATE)
    chamfer20_piece_2 = split(chamfer20_piece_2, bisect_by=Plane(origin=(23, 0, -56.787571351), z_dir=(-1, 0, 0)), keep=Keep.TOP, mode=Mode.PRIVATE)
    add(chamfer20_piece_2, mode=Mode.SUBTRACT)
    with BuildSketch(Plane(origin=(42.36309104, 0, -62.39690896), x_dir=(0, 1, 0), z_dir=(0.7071067811865476, 0, 0.7071067811865476))) as chamfer20_piece_3:
        Polygon((CHAMFER20_SIZE, 0), (0, CHAMFER20_SIZE), (0, 0), align=None)
    extrude(amount=28.332097008, mode=Mode.SUBTRACT)
    with BuildSketch(Plane(origin=(53.36309104, 0, 1.63690896), x_dir=(0, 1, 0), z_dir=(0.7071067811865476, 0, -0.7071067811865476))) as chamfer20_piece_4:
        Polygon((CHAMFER20_SIZE, 0), (0, -CHAMFER20_SIZE), (0, 0), align=None)
    extrude(amount=14.529372639, mode=Mode.SUBTRACT)
    with BuildSketch(Plane(origin=(56.789078368, 0, -27.751850553), x_dir=(0, 1, 0), z_dir=(0.38268343233471624, 0, 0.9238795325238679))) as chamfer20_piece_5_section:
        Polygon((CHAMFER20_SIZE, 0), (0, CHAMFER20_SIZE), (0, 0), align=None)
    chamfer20_piece_5 = extrude(amount=13.533908553, mode=Mode.PRIVATE)
    chamfer20_piece_5 = split(chamfer20_piece_5, bisect_by=Plane(origin=(56.789078368, 0, -23), z_dir=(0, 0, 1)), keep=Keep.TOP, mode=Mode.PRIVATE)
    add(chamfer20_piece_5, mode=Mode.SUBTRACT)
    with BuildSketch(Plane(origin=(56.789078368, 26, -27.751850553), x_dir=(0, -1, 0), z_dir=(0.3826834323347171, 0, 0.9238795325238676))) as chamfer20_piece_6_section:
        Polygon((CHAMFER20_SIZE, 0), (0, -CHAMFER20_SIZE), (0, 0), align=None)
    chamfer20_piece_6 = extrude(amount=15.698692953, mode=Mode.PRIVATE)
    chamfer20_piece_6 = split(chamfer20_piece_6, bisect_by=Plane(origin=(56.789078368, 21.124074723, -22.875925277), z_dir=(0, 0.7071067811865476, -0.7071067811865476)), keep=Keep.TOP, mode=Mode.PRIVATE)
    chamfer20_piece_6 = split(chamfer20_piece_6, bisect_by=Plane(origin=(56.789078368, 26, -23), z_dir=(0, 0, 1)), keep=Keep.TOP, mode=Mode.PRIVATE)
    add(chamfer20_piece_6, mode=Mode.SUBTRACT)
    with BuildSketch(Plane(origin=(51.143365976, 26, -58.76), x_dir=(0, -1, 0), z_dir=(-1, 0, 0))) as chamfer20_piece_7_section:
        Polygon((CHAMFER20_SIZE, 0), (0, CHAMFER20_SIZE), (0, 0), align=None)
    chamfer20_piece_7 = extrude(amount=33.286731952, mode=Mode.PRIVATE)
    chamfer20_piece_7 = split(chamfer20_piece_7, bisect_by=Plane(origin=(47.017076343, 26, -48.803389861), z_dir=(0.38285184984484405, 0, -0.9238097537211767)), keep=Keep.TOP, mode=Mode.PRIVATE)
    add(chamfer20_piece_7, mode=Mode.SUBTRACT)

    # Chamfer21: one chamfer whose edges measure the first distance from different faces: ONE call of the kernel's chamfer builder (chamfer() names one face for all edges)
    chamfer21_edges_1 = [part_1.edges().sort_by_distance(p)[0] for p in [
        (2.179092536, 0, -77.820907464),
    ]]
    chamfer21_side_1 = [part_1.faces().sort_by_distance(p)[0] for p in [
        (2.202160005, 1.868931891, -77.797839995),
    ]]
    chamfer21_edges_2 = [part_1.edges().sort_by_distance(p)[0] for p in [
        (17.5, 0, -77.5),
        (33.085786438, 0, -58.76),
        (58.76, 0, -33.085786438),
        (77.5, 26, -2.5),
        (58.76, 26, -34.5),
        (53.38, 26, -51.38),
        (17.5, 26, -77.5),
    ]]
    chamfer21_edges_3 = [part_1.edges().sort_by_distance(p)[0] for p in [
        (2.5, 26, -77.5),
    ]]
    chamfer21_side_3 = [part_1.faces().sort_by_distance(p)[0] for p in [
        (33.801139056, 26, -33.763899978),
    ]]
    chamfer21 = BRepFilletAPI_MakeChamfer(part_1.part.solid().wrapped)
    for e in chamfer21_edges_1:
        chamfer21.Add(CHAMFER21_SIZE, CHAMFER21_SIZE2, e.wrapped, chamfer21_side_1[0].wrapped)  # the first distance lies on this face
    for e in chamfer21_edges_2:
        chamfer21.Add(CHAMFER21_SIZE, e.wrapped)
    for e in chamfer21_edges_3:
        chamfer21.Add(CHAMFER21_SIZE, CHAMFER21_SIZE2_2, e.wrapped, chamfer21_side_3[0].wrapped)  # the first distance lies on this face
    add(Compound.cast(chamfer21.Shape()), mode=Mode.REPLACE)

    # Chamfer22
    # the kernel refuses this chamfer: 2 mm, written as the material it takes off along each edge
    with BuildSketch(Plane(origin=(13.248508344, 26, -62.798001492), x_dir=(0, -1, 0), z_dir=(0.9238097537213213, 0, 0.3828518498444948))) as chamfer22_piece_1_section:
        Polygon((CHAMFER22_SIZE, 0), (0, -CHAMFER22_SIZE), (0, 0), align=None)
    chamfer22_piece_1 = extrude(amount=20.914483432, mode=Mode.PRIVATE)
    chamfer22_piece_1 = split(chamfer22_piece_1, bisect_by=Plane(origin=(13.248508344, 22.980999254, -59.779000746), z_dir=(0, 0.7071067811865476, -0.7071067811865476)), keep=Keep.TOP, mode=Mode.PRIVATE)
    chamfer22_piece_1 = split(chamfer22_piece_1, bisect_by=Plane(origin=(15.624254172, 28.375745828, -62.798001492), z_dir=(0.7071067811865476, 0.7071067811865476, 0)), keep=Keep.TOP, mode=Mode.PRIVATE)
    add(chamfer22_piece_1, mode=Mode.SUBTRACT)
    with BuildSketch(Plane(origin=(13.248508344, 26, -62.798001492), x_dir=(0, -1, 0), z_dir=(0.9238097537213213, 0, 0.3828518498444948))) as chamfer22_piece_2_section:
        Polygon((CHAMFER22_SIZE, 0), (0, -CHAMFER22_SIZE), (0, 0), align=None)
    chamfer22_piece_2 = extrude(amount=20.914483432, mode=Mode.PRIVATE)
    chamfer22_piece_2 = split(chamfer22_piece_2, bisect_by=Plane(origin=(23, 26, -62.798001492), z_dir=(-1, 0, 0)), keep=Keep.TOP, mode=Mode.PRIVATE)
    chamfer22_piece_2 = split(chamfer22_piece_2, bisect_by=Plane(origin=(20, 26, -62.798001492), z_dir=(1, 0, 0)), keep=Keep.TOP, mode=Mode.PRIVATE)
    add(chamfer22_piece_2, mode=Mode.SUBTRACT)
    with BuildSketch(Plane(origin=(60, 0, -23.517470299), x_dir=(-1, 0, 0), z_dir=(0, 0, 1))) as chamfer22_piece_3:
        Polygon((CHAMFER22_SIZE, 0), (0, -CHAMFER22_SIZE), (0, 0), align=None)
    extrude(amount=20.83240915, mode=Mode.SUBTRACT)

    # Chamfer23
    chamfer23_edges = [part_1.edges().sort_by_distance(p)[0] for p in [
        (20, 0, -12),
    ]]
    chamfer(chamfer23_edges, length=CHAMFER23_SIZE)

    # Sketch46 → Cut-Extrude28 (cut)
    with BuildSketch(Plane(origin=(0, 0, 0), x_dir=(-1, 0, 0), z_dir=(0, -1, 0))):
        Polygon((-48.545986324, 42.024013676), (-44.084566037, 40.828579713), (-40.818579713, 44.094566037), (-42.014013676, 48.555986324), (-46.475433963, 49.751420287), (-49.741420287, 46.485433963), align=None)
    extrude(amount=-CUT_EXTRUDE28_DEPTH, mode=Mode.SUBTRACT)

    # Sketch45 → Cut-Extrude29 (cut)
    with BuildSketch(Plane(origin=(0, 26, 0), x_dir=(1, 0, 0), z_dir=(0, 1, 0))):
        with Locations(Location((45.29, 45.29, 0), (0, 0, 270))):
            Circle(SKETCH45_R)
    extrude(amount=-CUT_EXTRUDE29_DEPTH, mode=Mode.SUBTRACT)

    # Sketch47 → Cut-Extrude30 (cut)
    with BuildSketch(Plane(origin=(0, 26, 0), x_dir=(1, 0, 0), z_dir=(0, 1, 0))):
        with Locations(Location((45.29, 45.29, 0), (0, 0, 270))):
            Circle(SKETCH47_R)
    extrude(amount=-CUT_EXTRUDE30_DEPTH, mode=Mode.SUBTRACT)


solid = part_1.part
